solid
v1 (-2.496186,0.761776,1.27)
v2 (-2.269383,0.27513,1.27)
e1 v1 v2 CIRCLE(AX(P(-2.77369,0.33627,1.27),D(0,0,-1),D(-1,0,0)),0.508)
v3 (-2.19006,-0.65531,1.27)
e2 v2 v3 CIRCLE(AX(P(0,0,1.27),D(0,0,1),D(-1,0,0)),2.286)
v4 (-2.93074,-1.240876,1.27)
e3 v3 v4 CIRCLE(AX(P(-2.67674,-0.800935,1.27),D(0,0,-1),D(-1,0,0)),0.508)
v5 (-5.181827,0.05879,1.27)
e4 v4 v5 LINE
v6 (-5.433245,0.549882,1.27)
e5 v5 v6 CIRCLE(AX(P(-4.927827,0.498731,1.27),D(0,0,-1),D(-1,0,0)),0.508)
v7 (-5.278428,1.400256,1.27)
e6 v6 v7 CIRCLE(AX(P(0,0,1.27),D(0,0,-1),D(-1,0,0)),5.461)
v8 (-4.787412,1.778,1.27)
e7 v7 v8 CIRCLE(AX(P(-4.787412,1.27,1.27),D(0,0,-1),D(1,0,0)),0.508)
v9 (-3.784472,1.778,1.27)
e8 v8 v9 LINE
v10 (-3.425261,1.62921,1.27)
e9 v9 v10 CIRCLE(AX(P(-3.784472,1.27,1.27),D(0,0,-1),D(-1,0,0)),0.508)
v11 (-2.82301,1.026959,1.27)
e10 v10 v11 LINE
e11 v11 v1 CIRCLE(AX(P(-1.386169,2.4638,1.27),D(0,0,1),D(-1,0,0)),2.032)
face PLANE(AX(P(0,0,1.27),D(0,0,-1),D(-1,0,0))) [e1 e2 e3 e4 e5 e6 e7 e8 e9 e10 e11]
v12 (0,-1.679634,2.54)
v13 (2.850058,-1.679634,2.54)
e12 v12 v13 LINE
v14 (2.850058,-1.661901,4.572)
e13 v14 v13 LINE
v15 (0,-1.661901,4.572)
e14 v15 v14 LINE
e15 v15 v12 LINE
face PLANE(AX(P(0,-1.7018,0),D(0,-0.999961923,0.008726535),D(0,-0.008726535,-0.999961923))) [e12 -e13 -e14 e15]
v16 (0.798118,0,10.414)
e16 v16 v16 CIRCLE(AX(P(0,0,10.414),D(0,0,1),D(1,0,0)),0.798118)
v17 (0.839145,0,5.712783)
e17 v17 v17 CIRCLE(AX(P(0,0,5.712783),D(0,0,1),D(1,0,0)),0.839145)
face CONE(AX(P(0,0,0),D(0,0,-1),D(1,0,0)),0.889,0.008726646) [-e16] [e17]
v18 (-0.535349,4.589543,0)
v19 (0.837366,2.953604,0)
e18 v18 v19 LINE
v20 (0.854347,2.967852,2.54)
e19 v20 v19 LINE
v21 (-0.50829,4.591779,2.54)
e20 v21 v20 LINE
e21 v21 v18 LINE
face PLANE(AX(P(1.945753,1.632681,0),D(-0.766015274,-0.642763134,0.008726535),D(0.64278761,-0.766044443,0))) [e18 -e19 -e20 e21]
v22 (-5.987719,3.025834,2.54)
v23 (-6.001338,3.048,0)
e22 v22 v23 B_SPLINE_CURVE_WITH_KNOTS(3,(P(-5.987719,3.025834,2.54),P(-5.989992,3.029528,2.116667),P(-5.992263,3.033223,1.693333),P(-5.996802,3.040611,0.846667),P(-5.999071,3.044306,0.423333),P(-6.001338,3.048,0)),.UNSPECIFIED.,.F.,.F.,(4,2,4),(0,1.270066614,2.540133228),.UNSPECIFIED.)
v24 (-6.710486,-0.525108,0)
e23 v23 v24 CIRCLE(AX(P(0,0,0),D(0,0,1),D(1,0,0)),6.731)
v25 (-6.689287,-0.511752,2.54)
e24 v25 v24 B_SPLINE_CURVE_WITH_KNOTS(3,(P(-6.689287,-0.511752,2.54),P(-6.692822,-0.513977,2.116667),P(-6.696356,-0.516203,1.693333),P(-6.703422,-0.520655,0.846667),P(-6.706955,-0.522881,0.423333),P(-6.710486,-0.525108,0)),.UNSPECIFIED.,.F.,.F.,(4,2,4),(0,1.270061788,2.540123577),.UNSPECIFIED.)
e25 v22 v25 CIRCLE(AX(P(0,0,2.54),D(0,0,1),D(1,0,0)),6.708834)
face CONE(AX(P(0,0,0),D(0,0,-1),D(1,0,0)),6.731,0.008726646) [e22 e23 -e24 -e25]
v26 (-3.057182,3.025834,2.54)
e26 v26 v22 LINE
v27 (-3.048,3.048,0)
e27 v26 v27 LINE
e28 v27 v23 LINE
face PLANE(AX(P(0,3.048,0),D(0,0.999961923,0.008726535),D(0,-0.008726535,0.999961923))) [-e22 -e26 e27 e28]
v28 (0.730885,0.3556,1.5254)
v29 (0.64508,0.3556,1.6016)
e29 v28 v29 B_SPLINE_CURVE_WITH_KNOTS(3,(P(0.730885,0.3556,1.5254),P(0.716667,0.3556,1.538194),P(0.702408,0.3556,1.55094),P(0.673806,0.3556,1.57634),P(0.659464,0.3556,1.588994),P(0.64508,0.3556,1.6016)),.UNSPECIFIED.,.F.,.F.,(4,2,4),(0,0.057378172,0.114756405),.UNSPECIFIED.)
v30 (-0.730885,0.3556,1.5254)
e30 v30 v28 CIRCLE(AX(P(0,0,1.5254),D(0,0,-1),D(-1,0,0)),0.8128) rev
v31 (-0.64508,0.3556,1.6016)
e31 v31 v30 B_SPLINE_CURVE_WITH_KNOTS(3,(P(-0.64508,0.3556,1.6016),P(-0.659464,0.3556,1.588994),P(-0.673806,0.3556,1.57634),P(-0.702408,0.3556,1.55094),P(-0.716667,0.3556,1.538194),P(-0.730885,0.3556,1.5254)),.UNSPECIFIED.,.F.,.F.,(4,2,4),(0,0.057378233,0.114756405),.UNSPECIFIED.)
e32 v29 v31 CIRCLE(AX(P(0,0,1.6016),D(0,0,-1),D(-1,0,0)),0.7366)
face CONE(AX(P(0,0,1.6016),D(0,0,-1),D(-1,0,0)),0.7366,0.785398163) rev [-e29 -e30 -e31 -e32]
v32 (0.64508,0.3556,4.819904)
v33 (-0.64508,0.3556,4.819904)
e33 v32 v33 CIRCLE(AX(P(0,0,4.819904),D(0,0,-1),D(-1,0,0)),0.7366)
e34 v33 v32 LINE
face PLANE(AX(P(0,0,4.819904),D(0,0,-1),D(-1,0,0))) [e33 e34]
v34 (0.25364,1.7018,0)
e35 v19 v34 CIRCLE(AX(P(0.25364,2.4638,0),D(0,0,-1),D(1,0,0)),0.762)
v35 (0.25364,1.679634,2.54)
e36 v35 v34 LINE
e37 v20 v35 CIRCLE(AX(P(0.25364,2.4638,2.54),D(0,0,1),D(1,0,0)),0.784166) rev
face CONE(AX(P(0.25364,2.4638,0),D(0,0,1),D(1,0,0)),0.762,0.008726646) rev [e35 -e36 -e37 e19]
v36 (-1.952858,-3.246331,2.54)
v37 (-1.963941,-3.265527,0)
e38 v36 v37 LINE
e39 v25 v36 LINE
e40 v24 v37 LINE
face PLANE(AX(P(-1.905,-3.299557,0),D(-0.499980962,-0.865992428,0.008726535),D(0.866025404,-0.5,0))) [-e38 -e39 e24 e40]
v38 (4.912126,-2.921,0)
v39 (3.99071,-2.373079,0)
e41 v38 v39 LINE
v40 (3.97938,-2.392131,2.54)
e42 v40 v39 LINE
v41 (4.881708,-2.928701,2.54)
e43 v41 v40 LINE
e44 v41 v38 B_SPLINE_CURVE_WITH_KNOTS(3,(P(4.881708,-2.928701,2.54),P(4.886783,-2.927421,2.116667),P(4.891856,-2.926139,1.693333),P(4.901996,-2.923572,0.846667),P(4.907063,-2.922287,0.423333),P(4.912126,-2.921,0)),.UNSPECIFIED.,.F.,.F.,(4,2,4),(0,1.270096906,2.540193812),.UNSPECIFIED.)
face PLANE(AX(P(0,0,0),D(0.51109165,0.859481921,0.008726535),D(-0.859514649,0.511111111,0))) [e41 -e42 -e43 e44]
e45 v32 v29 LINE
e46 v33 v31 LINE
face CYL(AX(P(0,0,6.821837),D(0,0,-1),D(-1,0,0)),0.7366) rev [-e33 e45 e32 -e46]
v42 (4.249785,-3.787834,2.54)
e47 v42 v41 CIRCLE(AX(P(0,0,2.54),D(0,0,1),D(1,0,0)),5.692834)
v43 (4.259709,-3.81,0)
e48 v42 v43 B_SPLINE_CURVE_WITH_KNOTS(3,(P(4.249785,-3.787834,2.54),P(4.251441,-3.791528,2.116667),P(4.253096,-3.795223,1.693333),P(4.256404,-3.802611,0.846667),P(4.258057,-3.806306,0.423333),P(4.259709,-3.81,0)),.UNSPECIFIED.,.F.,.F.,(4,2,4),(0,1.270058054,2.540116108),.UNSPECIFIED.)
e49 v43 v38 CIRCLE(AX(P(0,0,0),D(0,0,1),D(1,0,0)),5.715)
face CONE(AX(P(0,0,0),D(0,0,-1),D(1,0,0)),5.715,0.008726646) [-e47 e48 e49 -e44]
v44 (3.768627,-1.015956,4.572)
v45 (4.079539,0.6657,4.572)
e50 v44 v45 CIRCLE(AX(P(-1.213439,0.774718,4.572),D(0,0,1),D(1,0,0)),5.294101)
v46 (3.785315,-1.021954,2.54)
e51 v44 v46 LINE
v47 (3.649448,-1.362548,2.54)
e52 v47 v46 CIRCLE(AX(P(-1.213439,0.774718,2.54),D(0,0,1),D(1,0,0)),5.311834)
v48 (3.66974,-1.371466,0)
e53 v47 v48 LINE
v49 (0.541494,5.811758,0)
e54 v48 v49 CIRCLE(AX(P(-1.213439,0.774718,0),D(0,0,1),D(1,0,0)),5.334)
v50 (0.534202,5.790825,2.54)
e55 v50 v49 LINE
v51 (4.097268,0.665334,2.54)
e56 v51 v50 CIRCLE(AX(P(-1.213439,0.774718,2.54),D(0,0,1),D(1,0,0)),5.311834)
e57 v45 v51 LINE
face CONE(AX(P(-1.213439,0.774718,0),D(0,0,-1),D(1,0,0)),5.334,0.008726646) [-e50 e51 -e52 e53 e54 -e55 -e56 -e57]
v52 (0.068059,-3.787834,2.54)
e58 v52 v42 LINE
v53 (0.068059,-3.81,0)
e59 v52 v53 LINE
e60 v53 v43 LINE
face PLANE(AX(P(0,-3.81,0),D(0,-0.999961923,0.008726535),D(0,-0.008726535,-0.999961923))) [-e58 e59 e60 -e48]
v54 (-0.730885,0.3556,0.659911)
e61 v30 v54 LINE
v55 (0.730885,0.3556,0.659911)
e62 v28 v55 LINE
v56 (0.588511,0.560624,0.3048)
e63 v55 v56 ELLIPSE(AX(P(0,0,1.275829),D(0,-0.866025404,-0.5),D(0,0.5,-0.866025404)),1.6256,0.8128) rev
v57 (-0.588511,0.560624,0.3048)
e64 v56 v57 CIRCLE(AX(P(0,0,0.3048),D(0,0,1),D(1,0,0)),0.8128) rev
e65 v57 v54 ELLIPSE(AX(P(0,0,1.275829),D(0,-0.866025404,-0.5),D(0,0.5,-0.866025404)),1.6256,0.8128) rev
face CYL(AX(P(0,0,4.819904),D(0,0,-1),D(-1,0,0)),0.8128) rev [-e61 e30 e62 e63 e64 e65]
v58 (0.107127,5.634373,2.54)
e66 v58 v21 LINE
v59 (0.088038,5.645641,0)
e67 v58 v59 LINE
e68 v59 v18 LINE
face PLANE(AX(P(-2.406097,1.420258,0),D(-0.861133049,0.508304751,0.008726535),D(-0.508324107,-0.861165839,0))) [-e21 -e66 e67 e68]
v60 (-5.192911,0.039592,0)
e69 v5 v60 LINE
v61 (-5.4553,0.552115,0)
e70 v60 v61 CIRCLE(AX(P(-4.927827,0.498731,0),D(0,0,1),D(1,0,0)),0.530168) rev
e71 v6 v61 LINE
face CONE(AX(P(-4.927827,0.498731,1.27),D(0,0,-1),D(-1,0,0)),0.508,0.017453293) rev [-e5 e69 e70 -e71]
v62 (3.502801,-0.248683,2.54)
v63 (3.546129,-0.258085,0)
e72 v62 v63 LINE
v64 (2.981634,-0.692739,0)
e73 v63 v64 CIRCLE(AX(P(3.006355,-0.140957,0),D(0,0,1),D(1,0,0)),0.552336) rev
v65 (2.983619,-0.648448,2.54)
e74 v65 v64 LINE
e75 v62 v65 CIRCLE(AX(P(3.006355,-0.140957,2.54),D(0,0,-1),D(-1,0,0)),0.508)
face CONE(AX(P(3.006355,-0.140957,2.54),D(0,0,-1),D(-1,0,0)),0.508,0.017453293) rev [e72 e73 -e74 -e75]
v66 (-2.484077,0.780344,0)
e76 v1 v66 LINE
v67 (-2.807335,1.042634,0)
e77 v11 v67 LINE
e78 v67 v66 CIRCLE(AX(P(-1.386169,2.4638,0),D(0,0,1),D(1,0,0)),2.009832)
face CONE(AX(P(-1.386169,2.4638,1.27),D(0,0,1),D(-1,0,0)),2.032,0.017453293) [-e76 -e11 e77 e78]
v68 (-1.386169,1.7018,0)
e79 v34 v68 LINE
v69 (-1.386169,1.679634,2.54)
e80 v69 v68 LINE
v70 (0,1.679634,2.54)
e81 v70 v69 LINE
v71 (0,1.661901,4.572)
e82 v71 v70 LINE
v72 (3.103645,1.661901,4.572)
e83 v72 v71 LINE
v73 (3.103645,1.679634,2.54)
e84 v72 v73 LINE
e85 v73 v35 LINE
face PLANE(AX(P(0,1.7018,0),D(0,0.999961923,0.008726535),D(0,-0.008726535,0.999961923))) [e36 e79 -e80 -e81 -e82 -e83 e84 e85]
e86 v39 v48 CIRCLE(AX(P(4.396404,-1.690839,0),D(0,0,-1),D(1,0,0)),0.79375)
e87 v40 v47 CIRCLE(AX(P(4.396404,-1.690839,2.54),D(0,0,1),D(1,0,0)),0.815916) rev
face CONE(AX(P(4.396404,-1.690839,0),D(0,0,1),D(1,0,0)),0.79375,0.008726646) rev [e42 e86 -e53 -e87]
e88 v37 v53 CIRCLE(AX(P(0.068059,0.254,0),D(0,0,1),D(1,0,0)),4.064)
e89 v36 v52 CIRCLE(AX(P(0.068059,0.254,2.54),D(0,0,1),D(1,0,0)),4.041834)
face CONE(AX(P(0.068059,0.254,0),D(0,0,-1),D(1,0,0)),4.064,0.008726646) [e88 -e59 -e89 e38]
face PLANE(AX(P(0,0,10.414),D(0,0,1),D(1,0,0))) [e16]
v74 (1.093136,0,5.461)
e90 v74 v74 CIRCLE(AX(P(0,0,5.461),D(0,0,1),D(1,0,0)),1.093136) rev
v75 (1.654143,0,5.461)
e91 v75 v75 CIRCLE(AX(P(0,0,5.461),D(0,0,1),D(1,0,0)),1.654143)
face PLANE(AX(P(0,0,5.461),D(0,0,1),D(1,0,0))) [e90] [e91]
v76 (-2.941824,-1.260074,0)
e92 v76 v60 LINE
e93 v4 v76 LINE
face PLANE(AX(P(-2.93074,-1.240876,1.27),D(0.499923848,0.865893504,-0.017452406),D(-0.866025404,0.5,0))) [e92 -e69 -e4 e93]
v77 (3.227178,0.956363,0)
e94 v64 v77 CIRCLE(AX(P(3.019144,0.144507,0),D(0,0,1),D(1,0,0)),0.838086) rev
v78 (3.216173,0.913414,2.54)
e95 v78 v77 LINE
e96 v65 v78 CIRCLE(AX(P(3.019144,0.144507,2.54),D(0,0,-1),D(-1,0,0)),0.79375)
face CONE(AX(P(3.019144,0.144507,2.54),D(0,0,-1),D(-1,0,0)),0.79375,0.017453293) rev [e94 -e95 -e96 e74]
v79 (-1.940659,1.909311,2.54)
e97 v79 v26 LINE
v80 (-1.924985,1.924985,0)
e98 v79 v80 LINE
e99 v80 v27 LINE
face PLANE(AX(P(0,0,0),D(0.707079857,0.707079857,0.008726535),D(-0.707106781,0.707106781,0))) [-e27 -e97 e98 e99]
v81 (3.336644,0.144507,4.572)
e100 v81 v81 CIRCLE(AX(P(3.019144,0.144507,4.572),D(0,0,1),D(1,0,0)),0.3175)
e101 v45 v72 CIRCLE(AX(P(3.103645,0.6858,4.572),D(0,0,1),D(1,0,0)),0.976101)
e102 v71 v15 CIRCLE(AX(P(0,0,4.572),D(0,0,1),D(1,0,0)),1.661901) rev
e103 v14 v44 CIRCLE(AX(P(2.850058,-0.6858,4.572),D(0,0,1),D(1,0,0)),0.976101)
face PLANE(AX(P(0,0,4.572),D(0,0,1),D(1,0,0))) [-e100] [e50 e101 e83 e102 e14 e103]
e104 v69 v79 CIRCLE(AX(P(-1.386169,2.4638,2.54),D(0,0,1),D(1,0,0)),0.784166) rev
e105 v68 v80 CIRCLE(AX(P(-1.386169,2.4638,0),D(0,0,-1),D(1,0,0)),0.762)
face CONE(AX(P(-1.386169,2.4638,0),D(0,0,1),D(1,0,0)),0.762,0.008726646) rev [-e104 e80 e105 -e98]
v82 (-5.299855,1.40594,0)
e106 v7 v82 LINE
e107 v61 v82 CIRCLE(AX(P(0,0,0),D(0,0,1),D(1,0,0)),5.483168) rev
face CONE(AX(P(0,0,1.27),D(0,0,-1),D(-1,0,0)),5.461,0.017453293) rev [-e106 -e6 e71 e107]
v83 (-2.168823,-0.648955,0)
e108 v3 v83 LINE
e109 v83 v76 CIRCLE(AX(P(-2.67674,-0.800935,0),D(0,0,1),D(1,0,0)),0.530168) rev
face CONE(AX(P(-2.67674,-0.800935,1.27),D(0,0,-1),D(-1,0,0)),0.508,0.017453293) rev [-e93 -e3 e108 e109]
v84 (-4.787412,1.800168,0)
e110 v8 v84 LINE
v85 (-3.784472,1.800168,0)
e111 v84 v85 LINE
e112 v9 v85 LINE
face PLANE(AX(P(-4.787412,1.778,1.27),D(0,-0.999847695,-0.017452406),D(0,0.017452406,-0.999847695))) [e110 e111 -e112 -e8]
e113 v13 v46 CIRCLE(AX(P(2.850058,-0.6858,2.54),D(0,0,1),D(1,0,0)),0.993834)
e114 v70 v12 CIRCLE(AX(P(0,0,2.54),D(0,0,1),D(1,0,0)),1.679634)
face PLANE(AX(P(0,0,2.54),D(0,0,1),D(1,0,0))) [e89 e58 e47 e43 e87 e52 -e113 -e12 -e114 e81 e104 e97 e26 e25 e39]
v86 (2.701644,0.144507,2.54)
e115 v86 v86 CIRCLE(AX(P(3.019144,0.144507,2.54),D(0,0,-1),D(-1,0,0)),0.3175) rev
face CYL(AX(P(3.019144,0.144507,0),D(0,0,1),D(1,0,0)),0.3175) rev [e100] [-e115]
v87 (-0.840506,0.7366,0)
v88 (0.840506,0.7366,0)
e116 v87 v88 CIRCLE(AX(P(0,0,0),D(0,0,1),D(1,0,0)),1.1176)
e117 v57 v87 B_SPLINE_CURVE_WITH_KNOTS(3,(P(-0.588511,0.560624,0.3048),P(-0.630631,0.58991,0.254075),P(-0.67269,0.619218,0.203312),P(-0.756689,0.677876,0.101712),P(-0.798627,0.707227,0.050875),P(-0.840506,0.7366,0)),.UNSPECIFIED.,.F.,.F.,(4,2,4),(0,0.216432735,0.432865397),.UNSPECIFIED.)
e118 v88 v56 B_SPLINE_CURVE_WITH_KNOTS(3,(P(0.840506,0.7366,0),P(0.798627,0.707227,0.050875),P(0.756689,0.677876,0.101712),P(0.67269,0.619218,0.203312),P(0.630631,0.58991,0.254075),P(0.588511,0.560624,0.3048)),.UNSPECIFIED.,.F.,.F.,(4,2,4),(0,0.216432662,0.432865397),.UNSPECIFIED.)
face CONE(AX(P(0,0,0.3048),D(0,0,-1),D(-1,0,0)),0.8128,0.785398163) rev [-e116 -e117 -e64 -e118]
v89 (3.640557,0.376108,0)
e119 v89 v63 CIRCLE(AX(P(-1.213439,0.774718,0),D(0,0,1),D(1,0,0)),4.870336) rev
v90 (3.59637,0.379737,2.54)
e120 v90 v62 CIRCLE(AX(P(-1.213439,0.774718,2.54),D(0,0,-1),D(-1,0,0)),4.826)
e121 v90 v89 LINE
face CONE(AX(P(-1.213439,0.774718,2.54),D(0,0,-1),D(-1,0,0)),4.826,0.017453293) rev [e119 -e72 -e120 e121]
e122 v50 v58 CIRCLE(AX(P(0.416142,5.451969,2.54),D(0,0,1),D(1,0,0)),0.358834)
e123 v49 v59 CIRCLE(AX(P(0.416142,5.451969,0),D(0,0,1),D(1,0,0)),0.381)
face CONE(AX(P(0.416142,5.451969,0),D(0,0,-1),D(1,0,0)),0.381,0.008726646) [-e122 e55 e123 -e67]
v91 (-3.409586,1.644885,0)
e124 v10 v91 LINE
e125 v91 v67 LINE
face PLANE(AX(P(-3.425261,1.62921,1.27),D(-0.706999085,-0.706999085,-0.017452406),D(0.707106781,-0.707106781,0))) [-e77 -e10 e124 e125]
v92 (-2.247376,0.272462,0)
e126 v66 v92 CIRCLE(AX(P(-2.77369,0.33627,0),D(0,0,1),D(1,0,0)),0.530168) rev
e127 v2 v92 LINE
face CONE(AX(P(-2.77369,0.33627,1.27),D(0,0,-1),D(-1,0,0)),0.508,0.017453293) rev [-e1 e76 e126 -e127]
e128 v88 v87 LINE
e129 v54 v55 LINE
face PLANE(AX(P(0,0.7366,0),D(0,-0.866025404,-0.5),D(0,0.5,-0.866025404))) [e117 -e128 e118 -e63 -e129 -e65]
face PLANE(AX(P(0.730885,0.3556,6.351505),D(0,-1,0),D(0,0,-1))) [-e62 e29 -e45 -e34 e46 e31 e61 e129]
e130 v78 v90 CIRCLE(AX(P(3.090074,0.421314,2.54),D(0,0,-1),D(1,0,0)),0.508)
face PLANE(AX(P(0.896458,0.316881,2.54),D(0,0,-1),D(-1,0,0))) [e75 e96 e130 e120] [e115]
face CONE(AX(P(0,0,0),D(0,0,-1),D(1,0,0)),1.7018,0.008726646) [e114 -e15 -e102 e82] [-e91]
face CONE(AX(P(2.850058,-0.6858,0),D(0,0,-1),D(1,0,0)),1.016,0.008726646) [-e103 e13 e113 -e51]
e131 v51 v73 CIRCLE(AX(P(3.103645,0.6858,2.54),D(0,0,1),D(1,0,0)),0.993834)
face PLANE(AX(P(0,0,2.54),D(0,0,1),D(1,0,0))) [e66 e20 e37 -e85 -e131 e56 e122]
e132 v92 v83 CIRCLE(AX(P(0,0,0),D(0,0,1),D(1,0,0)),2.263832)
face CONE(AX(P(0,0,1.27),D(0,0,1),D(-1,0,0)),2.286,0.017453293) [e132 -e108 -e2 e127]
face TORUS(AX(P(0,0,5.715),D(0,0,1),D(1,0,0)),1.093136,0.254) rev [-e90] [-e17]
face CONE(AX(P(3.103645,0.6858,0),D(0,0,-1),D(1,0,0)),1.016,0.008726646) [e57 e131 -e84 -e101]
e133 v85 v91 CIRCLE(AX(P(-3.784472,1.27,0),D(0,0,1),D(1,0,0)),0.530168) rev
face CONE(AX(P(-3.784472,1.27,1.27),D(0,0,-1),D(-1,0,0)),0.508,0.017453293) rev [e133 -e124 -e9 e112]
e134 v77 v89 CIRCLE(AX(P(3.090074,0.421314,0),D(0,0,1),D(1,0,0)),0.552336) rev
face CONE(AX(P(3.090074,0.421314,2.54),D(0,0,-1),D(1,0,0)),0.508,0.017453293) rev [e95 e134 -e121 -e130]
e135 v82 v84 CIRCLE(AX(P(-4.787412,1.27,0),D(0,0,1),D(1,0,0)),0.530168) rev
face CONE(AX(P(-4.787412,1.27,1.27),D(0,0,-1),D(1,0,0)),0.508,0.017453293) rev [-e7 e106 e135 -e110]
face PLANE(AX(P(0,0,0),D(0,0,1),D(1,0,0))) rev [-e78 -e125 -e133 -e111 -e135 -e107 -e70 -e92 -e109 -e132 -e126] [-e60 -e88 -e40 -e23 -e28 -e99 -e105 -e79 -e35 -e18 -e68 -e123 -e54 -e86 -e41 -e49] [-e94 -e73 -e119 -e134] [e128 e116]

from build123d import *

# Parameters (mm, degrees)
EXTRUDE1_DEPTH      = 2.54
SKETCH2_R           = 1.7018
EXTRUDE2_DEPTH      = 2.921
EXTRUDE5_DEPTH      = 2.032
SKETCH3_R           = 0.889
EXTRUDE3_DEPTH      = 4.953
EXTRUDE4_DEPTH      = 4.819904
CIRPATTERN1_COUNT   = 8
EXTRUDE13_DEPTH     = 4.819904
SKETCH7_R           = 0.3175
EXTRUDE6_DEPTH      = 11.651707
EXTRUDE10_DEPTH     = 2.54
EXTRUDE12_DEPTH     = 1.27
DRAFT5_ANGLE        = 1
DRAFT6_ANGLE        = 1
DRAFT7_ANGLE        = -0.5
FILLET1_R           = 0.254
CHAMFER1_SIZE       = 0.381
CHAMFER1_SIZE2      = 0.659911
EXTRUDE14_DEPTH     = 0.6604
BOSS_EXTRUDE1_DEPTH = 4.159504
CUT_EXTRUDE1_DEPTH  = 1.5
CHAMFER3_SIZE       = 0.1016
CHAMFER4_SIZE       = 0.3048


with BuildPart() as part:
    # Sketch1 → Extrude1 (new body)
    with BuildSketch(Plane.XY):
        with BuildLine():
            Line((-1.924985, 1.924985), (-3.048, 3.048))
            Line((-3.048, 3.048), (-6.001338, 3.048))
            ThreePointArc((-6.001338, 3.048), (-6.602226, 1.310331), (-6.710486, -0.525108))
            Line((-6.710486, -0.525108), (-1.963941, -3.265527))
            ThreePointArc((-1.963941, -3.265527), (-0.983782, -3.671523), (0.068059, -3.81))
            Line((0.068059, -3.81), (4.259709, -3.81))
            ThreePointArc((4.259709, -3.81), (4.60741, -3.381272), (4.912126, -2.921))
            Line((4.912126, -2.921), (3.99071, -2.373079))
            ThreePointArc((3.99071, -2.373079), (3.640517, -1.933065), (3.66974, -1.371466))
            ThreePointArc((3.66974, -1.371466), (3.67694, 2.904446), (0.541494, 5.811758))
            ThreePointArc((0.541494, 5.811758), (0.285086, 5.809719), (0.088038, 5.645641))
            Line((0.088038, 5.645641), (-0.535349, 4.589543))
            Line((-0.535349, 4.589543), (0.837366, 2.953604))
            ThreePointArc((0.837366, 2.953604), (0.944247, 2.141765), (0.25364, 1.7018))
            Line((0.25364, 1.7018), (-1.386169, 1.7018))
            ThreePointArc((-1.386169, 1.7018), (-1.677774, 1.759804), (-1.924985, 1.924985))
        make_face()
    extrude(amount=EXTRUDE1_DEPTH)

    # Sketch2 → Extrude2 (add)
    with BuildSketch(Plane.XY.offset(2.54)):
        with Locations(Location((0, 0, 0), (0, 0, 90))):
            Circle(SKETCH2_R)
    extrude(amount=EXTRUDE2_DEPTH)

    # Sketch6 → Extrude5 (add)
    with BuildSketch(Plane.XY.offset(2.54)):
        with BuildLine():
            Line((0, 1.7018), (3.103645, 1.7018))
            ThreePointArc((3.103645, 1.7018), (3.829425, 1.396785), (4.119429, 0.664878))
            ThreePointArc((4.119429, 0.664878), (4.031669, -0.195019), (3.806175, -1.029451))
            ThreePointArc((3.806175, -1.029451), (3.434483, -1.516885), (2.850058, -1.7018))
            Line((2.850058, -1.7018), (0, -1.7018))
            ThreePointArc((0, -1.7018), (1.7018, 0), (0, 1.7018))
        make_face()
    extrude(amount=EXTRUDE5_DEPTH)

    # Sketch3 → Extrude3 (add)
    with BuildSketch(Plane.XY.offset(5.461)):
        Circle(SKETCH3_R)
    extrude(amount=EXTRUDE3_DEPTH)

    # Sketch4 → Extrude4 (cut)
    with BuildSketch(Plane(origin=(0, 0, 0), x_dir=(-1, 0, 0), z_dir=(0, 0, -1))):
        with BuildLine():
            Line((0, 0), (-0.311045, 0.750929))
            ThreePointArc((-0.311045, 0.750929), (-0.238333, 0.777072), (-0.163468, 0.796192))
            ThreePointArc((-0.163468, 0.796192), (0, 0.7366), (0.163468, 0.796192))
            ThreePointArc((0.163468, 0.796192), (0.238333, 0.777072), (0.311045, 0.750929))
            Line((0.311045, 0.750929), (0, 0))
        make_face()
    extrude4 = extrude(amount=-EXTRUDE4_DEPTH, mode=Mode.SUBTRACT)

    # CirPattern1: Extrude4 ×8 about axis
    cirpattern1_axis = Axis((0, 0, 0), (0, 0, 1))
    for i in range(1, CIRPATTERN1_COUNT):
        add(extrude4.rotate(cirpattern1_axis, i * 360 / CIRPATTERN1_COUNT), mode=Mode.SUBTRACT)

    # Sketch14 → Extrude13 (add)
    with BuildSketch(Plane(origin=(0, 0, 0), x_dir=(-1, 0, 0), z_dir=(0, 0, -1))):
        with BuildLine():
            Line((-0.730885, 0.3556), (0.730885, 0.3556))
            ThreePointArc((0.730885, 0.3556), (0, 0.8128), (-0.730885, 0.3556))
        make_face()
    extrude(amount=-EXTRUDE13_DEPTH)

    # Sketch7 → Extrude6 (cut, through all)
    with BuildSketch(Plane.XY.offset(4.572)):
        with Locations((3.019144, 0.144507)):
            Circle(SKETCH7_R)
    extrude(amount=-EXTRUDE6_DEPTH, mode=Mode.SUBTRACT)

    # Sketch11 → Extrude10 (cut)
    with BuildSketch(Plane(origin=(0, 0, 0), x_dir=(-1, 0, 0), z_dir=(0, 0, -1))):
        with BuildLine():
            ThreePointArc((-2.983619, -0.648448), (-2.234049, 0.261404), (-3.216173, 0.913414))
            ThreePointArc((-3.216173, 0.913414), (-3.503818, 0.716068), (-3.59637, 0.379737))
            ThreePointArc((-3.59637, 0.379737), (-3.559938, 0.063985), (-3.502801, -0.248683))
            ThreePointArc((-3.502801, -0.248683), (-3.316279, -0.543462), (-2.983619, -0.648448))
        make_face()
    extrude(amount=-EXTRUDE10_DEPTH, mode=Mode.SUBTRACT)

    # Sketch13 → Extrude12 (cut)
    with BuildSketch(Plane(origin=(0, 0, 0), x_dir=(-1, 0, 0), z_dir=(0, 0, -1))):
        with BuildLine():
            Line((2.93074, -1.240876), (5.181827, 0.05879))
            ThreePointArc((5.181827, 0.05879), (5.380013, 0.267231), (5.433245, 0.549882))
            ThreePointArc((5.433245, 0.549882), (5.372687, 0.978137), (5.278428, 1.400256))
            ThreePointArc((5.278428, 1.400256), (5.097164, 1.672638), (4.787412, 1.778))
            Line((4.787412, 1.778), (3.784472, 1.778))
            ThreePointArc((3.784472, 1.778), (3.590069, 1.739331), (3.425261, 1.62921))
            Line((3.425261, 1.62921), (2.82301, 1.026959))
            ThreePointArc((2.82301, 1.026959), (2.666482, 0.885883), (2.496186, 0.761776))
            ThreePointArc((2.496186, 0.761776), (2.313241, 0.550864), (2.269383, 0.27513))
            ThreePointArc((2.269383, 0.27513), (2.277738, -0.194184), (2.19006, -0.65531))
            ThreePointArc((2.19006, -0.65531), (2.36169, -1.199441), (2.93074, -1.240876))
        make_face()
    extrude(amount=-EXTRUDE12_DEPTH, mode=Mode.SUBTRACT)

    # Draft5
    draft5_faces = [part.faces().sort_by_distance(p)[0] for p in [
        (3.316279, -0.543462, 1.27),
        (3.559938, 0.063985, 1.27),
        (3.503818, 0.716068, 1.27),
        (2.234049, 0.261404, 1.27),
    ]]
    draft(draft5_faces, Plane(origin=(0.896458, 0.316881, 2.54), x_dir=(-1, 0, 0), z_dir=(0, 0, -1)), DRAFT5_ANGLE)

    # Draft6
    draft6_faces = [part.faces().sort_by_distance(p)[0] for p in [
        (-2.666482, 0.885883, 0.635),
        (-2.313241, 0.550864, 0.635),
        (-2.277738, -0.194184, 0.635),
        (-2.36169, -1.199441, 0.635),
        (-4.056284, -0.591043, 0.635),
        (-5.380013, 0.267231, 0.635),
        (-5.372687, 0.978137, 0.635),
        (-5.097164, 1.672638, 0.635),
        (-4.285942, 1.778, 0.635),
        (-3.590069, 1.739331, 0.635),
        (-3.124136, 1.328085, 0.635),
    ]]
    draft(draft6_faces, Plane(origin=(0, 0, 1.27), x_dir=(-1, 0, 0), z_dir=(0, 0, -1)), DRAFT6_ANGLE)

    # Draft7
    draft7_faces = [part.faces().sort_by_distance(p)[0] for p in [
        (-0.889, 0, 7.9375),
        (0, -1.7018, 4.0005),
        (1.425029, -1.7018, 3.556),
        (4.60741, -3.381272, 1.27),
        (2.163884, -3.81, 1.27),
        (-0.983782, -3.671523, 1.27),
        (-4.337213, -1.895318, 1.27),
        (-6.602226, 1.310331, 1.27),
        (-4.524669, 3.048, 1.27),
        (-2.486492, 2.486492, 1.27),
        (-1.677774, 1.759804, 1.27),
        (0.285086, 5.809719, 1.27),
        (-0.223656, 5.117592, 1.27),
        (0.151008, 3.771574, 1.27),
        (0.944247, 2.141765, 1.27),
        (0.709356, 1.7018, 2.646746),
        (3.829425, 1.396785, 3.556),
        (3.434483, -1.516885, 3.556),
        (4.451418, -2.647039, 1.27),
        (3.640517, -1.933065, 1.27),
        (3.67694, 2.904446, 2.286),
    ]]
    draft(draft7_faces, Plane(origin=(0, 0, 0), x_dir=(-1, 0, 0), z_dir=(0, 0, -1)), DRAFT7_ANGLE)

    # Fillet1
    fillet1_edges = [part.edges().sort_by_distance(p)[0] for p in [
        (-0.841343, 0, 5.461),
    ]]
    fillet(fillet1_edges, radius=FILLET1_R)

    # Chamfer1
    chamfer1_edges = [part.edges().sort_by_distance(p)[0] for p in [
        (0, 0.3556, 0),
    ]]
    chamfer1_side = [part.faces().sort_by_distance(p)[0] for p in [
        (0.337088, 5.667766, 0),
    ]]
    chamfer(chamfer1_edges, length=CHAMFER1_SIZE, length2=CHAMFER1_SIZE2, reference=chamfer1_side[0])

    # Sketch16 → Extrude14 (cut)
    with BuildSketch(Plane(origin=(0, 0, 0), x_dir=(-1, 0, 0), z_dir=(0, 0, -1))):
        with BuildLine():
            Line((0.730885, 0.3556), (-0.730885, 0.3556))
            ThreePointArc((-0.730885, 0.3556), (0, -0.8128), (0.730885, 0.3556))
        make_face()
    extrude(amount=-EXTRUDE14_DEPTH, mode=Mode.SUBTRACT)

    # Sketch17 → Boss-Extrude1 (add)
    with BuildSketch(Plane(origin=(0, 0, 0.6604), x_dir=(-1, 0, 0), z_dir=(0, 0, -1))):
        with BuildLine():
            Line((0.730885, 0.3556), (0.64508, 0.3556))
            ThreePointArc((0.64508, 0.3556), (0, -0.7366), (-0.64508, 0.3556))
            Line((-0.64508, 0.3556), (-0.730885, 0.3556))
            ThreePointArc((-0.730885, 0.3556), (0, -0.8128), (0.730885, 0.3556))
        make_face()
    extrude(amount=-BOSS_EXTRUDE1_DEPTH)

    # Sketch18 → Cut-Extrude1 (cut)
    with BuildSketch(Plane(origin=(0, 0, 0), x_dir=(-1, 0, 0), z_dir=(0, 0, -1))):
        with BuildLine():
            Line((0.730885, 0.3556), (-0.730885, 0.3556))
            ThreePointArc((-0.730885, 0.3556), (0, -0.8128), (0.730885, 0.3556))
        make_face()
    extrude(amount=-CUT_EXTRUDE1_DEPTH, mode=Mode.SUBTRACT)

    # Chamfer3
    # the kernel refuses this chamfer: 0.1016 mm, written as the material it takes off along each edge
    with BuildSketch(Plane(origin=(0, 0, 1.5), x_dir=(0.6528066394182584, 0.7575245814700933, 0), z_dir=(-0.7575245814700933, 0.6528066394182584, 0))) as chamfer3_piece_1_section:
        Polygon((0.7366, -CHAMFER3_SIZE), (0.7366 + CHAMFER3_SIZE, 0), (0.7366, 0), align=None)
    chamfer3_piece_1 = revolve(axis=Axis((0, 0, 1.5), (0, 0, -1)), revolution_arc=278.492908, mode=Mode.PRIVATE)
    chamfer3_piece_1 = split(chamfer3_piece_1, bisect_by=Plane(origin=(0, 0.3556, 1.563136), z_dir=(0, -1, 0)), keep=Keep.TOP, mode=Mode.PRIVATE)
    chamfer3_piece_1 = chamfer3_piece_1 & Plane(origin=(0, 0, 1.563136), x_dir=(0.9795673076923074, 0.20111660722189145, 0), z_dir=(0, 0, -1)) * Cylinder(0.8128, 4, mode=Mode.PRIVATE)
    add(chamfer3_piece_1, mode=Mode.SUBTRACT)

    # Chamfer4
    chamfer4_edges = [part.edges().sort_by_distance(p)[0] for p in [
        (0, -0.8128, 0),
    ]]
    chamfer(chamfer4_edges, length=CHAMFER4_SIZE)


solid = part.part
